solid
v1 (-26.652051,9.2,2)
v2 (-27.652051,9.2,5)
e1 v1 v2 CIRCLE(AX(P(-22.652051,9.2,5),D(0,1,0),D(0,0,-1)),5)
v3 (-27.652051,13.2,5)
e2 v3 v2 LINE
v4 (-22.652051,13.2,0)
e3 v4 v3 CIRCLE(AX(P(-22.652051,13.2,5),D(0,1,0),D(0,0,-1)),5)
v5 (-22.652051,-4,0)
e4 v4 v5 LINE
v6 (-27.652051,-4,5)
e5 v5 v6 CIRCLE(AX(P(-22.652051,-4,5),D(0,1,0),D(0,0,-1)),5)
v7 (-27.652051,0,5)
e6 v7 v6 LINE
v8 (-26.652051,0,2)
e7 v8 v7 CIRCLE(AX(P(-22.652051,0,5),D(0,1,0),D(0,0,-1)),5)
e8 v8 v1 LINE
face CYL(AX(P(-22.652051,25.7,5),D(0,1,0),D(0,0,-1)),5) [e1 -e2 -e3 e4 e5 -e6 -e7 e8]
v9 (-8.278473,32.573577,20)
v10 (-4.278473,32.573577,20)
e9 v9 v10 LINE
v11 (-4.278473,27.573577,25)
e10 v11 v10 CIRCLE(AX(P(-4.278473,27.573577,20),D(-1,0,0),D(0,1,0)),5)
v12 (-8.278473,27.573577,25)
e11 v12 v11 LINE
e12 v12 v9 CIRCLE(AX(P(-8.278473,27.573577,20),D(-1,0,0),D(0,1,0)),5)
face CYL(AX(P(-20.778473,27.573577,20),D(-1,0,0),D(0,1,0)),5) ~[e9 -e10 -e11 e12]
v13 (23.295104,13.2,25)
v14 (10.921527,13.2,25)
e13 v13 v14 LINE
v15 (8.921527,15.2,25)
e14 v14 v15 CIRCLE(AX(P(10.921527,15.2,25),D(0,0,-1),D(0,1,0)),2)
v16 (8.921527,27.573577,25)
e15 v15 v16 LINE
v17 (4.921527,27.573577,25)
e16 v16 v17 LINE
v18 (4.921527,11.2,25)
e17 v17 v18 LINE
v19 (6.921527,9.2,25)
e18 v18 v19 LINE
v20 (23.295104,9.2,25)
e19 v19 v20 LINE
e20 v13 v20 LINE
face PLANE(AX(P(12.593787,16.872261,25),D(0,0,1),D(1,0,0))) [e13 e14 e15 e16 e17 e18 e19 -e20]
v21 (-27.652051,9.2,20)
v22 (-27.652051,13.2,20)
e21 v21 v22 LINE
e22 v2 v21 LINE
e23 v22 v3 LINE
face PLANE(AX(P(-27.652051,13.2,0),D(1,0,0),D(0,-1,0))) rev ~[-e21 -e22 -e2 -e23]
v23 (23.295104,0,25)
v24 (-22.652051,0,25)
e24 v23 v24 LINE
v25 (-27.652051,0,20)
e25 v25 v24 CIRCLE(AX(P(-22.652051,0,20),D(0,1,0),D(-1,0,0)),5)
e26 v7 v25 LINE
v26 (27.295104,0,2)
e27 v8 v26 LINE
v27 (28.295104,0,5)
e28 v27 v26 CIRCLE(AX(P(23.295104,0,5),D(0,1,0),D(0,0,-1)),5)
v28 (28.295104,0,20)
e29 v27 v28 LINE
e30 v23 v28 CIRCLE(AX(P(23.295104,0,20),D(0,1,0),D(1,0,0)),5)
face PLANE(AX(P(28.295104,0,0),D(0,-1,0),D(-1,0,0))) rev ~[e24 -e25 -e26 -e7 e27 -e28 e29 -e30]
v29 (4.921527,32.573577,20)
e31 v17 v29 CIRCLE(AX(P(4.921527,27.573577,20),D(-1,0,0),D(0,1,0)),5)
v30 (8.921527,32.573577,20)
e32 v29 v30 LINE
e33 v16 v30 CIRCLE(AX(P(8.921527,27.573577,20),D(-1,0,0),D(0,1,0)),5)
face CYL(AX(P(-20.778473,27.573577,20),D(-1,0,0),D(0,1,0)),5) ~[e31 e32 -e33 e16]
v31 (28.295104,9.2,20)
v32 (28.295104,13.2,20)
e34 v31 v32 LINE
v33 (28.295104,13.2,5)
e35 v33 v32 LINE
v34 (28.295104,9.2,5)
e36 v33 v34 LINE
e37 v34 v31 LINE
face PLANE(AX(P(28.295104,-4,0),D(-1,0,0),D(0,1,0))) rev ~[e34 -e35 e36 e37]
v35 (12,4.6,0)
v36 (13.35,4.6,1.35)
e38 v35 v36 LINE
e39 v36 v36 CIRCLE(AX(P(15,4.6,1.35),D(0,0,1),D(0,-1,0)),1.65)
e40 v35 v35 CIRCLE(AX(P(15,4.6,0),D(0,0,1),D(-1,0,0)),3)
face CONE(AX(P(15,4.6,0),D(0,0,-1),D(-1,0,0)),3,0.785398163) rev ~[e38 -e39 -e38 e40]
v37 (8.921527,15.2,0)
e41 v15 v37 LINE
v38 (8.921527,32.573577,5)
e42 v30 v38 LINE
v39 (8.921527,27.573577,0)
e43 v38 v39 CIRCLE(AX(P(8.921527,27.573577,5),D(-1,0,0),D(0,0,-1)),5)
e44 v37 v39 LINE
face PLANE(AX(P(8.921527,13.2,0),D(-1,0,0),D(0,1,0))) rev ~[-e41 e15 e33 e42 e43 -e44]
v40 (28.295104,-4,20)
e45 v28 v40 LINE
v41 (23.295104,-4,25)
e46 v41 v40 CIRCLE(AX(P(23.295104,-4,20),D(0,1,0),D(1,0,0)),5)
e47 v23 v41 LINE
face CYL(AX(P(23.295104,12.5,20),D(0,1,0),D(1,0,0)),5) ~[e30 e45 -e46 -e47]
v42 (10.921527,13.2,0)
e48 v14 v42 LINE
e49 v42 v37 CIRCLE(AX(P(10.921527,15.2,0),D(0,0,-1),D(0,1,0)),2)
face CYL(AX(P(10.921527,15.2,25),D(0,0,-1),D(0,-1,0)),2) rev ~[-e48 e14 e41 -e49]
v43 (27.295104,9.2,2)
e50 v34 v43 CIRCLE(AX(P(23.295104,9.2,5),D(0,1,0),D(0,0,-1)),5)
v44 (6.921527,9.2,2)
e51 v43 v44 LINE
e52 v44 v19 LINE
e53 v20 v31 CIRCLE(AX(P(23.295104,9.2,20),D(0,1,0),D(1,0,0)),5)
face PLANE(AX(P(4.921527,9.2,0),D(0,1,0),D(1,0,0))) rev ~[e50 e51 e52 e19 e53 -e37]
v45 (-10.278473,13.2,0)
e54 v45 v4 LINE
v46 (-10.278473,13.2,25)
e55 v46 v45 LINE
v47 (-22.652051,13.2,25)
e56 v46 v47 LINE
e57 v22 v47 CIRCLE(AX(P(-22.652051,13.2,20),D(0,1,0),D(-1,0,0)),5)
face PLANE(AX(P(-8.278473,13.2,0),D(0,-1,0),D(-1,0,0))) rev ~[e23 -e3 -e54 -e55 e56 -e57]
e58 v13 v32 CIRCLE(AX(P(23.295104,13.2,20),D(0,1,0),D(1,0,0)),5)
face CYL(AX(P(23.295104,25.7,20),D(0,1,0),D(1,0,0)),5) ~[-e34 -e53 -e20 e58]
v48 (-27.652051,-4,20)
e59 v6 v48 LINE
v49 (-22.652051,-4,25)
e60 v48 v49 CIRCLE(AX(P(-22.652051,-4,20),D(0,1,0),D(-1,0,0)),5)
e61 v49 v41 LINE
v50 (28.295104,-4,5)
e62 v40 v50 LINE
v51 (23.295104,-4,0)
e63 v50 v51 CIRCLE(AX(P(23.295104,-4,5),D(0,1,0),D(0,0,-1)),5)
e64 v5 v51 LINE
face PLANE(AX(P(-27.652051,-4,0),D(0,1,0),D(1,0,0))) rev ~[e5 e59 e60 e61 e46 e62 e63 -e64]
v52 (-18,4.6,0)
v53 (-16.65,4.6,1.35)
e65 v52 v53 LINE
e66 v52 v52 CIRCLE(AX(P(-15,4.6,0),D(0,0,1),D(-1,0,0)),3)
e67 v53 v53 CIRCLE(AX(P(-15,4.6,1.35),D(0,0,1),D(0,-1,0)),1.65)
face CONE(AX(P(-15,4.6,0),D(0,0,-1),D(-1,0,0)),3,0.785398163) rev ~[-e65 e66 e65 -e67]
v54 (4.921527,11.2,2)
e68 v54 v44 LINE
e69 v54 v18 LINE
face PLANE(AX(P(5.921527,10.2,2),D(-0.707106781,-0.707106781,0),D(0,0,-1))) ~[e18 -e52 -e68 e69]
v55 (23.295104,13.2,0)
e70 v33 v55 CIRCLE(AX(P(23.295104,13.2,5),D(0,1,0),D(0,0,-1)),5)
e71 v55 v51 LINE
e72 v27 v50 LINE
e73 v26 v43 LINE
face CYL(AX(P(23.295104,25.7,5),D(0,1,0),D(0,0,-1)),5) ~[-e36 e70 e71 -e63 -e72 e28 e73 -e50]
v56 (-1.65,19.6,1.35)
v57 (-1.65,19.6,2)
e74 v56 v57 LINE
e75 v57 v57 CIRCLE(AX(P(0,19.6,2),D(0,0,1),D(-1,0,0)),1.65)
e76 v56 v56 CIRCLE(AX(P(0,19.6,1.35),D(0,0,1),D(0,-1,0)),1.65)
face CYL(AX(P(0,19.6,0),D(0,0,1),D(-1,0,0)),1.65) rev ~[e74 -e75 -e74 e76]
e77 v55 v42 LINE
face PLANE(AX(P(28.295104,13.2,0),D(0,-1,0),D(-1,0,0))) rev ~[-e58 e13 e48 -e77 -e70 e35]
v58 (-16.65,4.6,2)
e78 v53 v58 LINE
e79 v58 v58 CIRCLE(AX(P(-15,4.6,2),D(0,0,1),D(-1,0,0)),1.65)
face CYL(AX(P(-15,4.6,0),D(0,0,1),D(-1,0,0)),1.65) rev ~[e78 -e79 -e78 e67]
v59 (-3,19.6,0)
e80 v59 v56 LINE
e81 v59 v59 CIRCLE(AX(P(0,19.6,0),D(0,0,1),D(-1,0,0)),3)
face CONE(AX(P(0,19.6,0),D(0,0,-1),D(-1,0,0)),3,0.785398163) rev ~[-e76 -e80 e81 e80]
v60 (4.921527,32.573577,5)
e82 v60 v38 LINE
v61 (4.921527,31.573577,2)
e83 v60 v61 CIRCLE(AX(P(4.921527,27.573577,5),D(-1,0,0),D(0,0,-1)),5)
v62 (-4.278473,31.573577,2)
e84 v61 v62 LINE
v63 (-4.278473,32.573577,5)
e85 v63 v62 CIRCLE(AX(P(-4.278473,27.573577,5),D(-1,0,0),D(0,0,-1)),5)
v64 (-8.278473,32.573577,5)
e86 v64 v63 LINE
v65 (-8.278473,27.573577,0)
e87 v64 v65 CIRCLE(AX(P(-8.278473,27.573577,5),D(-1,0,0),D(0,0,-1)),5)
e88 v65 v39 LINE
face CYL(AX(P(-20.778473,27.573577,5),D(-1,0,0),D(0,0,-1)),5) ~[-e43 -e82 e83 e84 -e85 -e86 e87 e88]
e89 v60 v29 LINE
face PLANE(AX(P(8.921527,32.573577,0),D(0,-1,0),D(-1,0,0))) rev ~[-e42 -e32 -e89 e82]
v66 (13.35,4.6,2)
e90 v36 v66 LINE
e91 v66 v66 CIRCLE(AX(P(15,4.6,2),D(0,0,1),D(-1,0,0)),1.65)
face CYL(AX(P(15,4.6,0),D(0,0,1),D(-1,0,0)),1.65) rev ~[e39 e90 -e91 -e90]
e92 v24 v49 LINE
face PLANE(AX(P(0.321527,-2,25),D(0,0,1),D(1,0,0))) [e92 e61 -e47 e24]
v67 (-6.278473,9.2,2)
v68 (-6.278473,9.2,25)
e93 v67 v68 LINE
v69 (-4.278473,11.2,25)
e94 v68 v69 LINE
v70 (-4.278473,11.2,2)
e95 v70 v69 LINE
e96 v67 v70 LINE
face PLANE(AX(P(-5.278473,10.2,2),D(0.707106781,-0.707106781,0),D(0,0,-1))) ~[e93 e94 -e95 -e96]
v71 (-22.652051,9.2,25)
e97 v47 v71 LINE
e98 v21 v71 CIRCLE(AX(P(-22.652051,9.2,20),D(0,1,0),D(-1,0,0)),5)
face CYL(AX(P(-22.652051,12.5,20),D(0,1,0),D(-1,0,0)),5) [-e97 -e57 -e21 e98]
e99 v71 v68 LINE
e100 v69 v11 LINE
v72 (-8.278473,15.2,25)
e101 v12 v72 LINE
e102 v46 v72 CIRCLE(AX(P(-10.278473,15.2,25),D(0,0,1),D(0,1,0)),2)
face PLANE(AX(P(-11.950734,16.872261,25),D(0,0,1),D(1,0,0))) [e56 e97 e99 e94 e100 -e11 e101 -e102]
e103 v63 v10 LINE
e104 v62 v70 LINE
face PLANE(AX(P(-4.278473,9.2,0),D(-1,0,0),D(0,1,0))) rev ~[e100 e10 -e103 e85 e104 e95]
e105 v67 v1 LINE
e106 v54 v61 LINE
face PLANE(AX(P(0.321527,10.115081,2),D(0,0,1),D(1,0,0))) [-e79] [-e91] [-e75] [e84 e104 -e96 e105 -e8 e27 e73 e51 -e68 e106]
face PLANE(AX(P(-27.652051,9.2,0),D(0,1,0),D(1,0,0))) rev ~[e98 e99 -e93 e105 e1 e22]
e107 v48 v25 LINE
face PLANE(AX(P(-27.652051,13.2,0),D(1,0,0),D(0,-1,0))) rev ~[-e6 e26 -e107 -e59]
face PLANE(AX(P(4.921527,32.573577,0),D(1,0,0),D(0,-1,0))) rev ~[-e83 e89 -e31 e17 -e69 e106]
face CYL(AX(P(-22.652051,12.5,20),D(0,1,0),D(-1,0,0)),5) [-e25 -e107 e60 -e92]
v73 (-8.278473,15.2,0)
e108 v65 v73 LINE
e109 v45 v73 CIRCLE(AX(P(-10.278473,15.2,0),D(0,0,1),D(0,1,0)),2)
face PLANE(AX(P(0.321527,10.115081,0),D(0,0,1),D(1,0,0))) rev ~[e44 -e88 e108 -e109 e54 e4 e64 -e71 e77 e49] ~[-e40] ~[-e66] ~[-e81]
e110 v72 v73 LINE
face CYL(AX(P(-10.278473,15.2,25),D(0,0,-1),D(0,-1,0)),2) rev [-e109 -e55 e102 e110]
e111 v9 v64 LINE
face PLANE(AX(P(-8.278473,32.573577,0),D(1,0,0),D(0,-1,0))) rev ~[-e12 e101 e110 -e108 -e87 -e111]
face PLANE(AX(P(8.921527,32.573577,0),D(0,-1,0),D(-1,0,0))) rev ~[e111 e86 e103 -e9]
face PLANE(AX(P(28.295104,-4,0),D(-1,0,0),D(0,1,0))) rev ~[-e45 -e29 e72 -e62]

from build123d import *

# Parameters (mm, degrees)
F1_DEPTH       = 2
F2_DEPTH       = 25
F3_R           = 2
F4_T1_DEPTH    = 29
F4_T3_DEPTH    = 29
F4_T5_DEPTH    = 29
F4_T7_DEPTH    = 29
F4_T9_DEPTH    = 42.2
F4_T11_DEPTH   = 42.2
F5_R           = 2
F6_SIZE        = 2
F8_D           = 3.3
F8_CSINK_D     = 6
F8_CSINK_ANGLE = 90


# Not quite as in the source:
# - a fillet or chamfer that OpenCascade refuses, or shapes differently, is made with other operations: its cross-section is extruded or revolved along the edge and cut away or added


with BuildPart() as f1:
    # F0 (on Top) → F1 (new body)
    with BuildSketch(Plane.XY):
        Polygon((-27.6520505063, 0), (0, 0), (28.2951036699, 0), (28.2951036699, 9.2), (4.9215265818, 9.2), (4.9215265818, 32.5735770881), (-4.2784734182, 32.5735770881), (-4.2784734182, 9.2), (-27.6520505063, 9.2), align=None)
        Polygon((28.2951036699, 0), (0, 0), (-27.6520505063, 0), (-27.6520505063, -4), (0, -4), (28.2951036699, -4), align=None)
        Polygon((4.9215265818, 9.2), (28.2951036699, 9.2), (28.2951036699, 13.2), (8.9215265818, 13.2), (8.9215265818, 32.5735770881), (4.9215265818, 32.5735770881), align=None)
        Polygon((-27.6520505063, 13.2), (-27.6520505063, 9.2), (-4.2784734182, 9.2), (-4.2784734182, 32.5735770881), (-8.2784734182, 32.5735770881), (-8.2784734182, 13.2), align=None)
    extrude(amount=F1_DEPTH)

    # F0 (on Top) → F2 (join)
    with BuildSketch(Plane.XY):
        Polygon((-27.6520505063, 13.2), (-27.6520505063, 9.2), (-4.2784734182, 9.2), (-4.2784734182, 32.5735770881), (-8.2784734182, 32.5735770881), (-8.2784734182, 13.2), align=None)
        Polygon((4.9215265818, 9.2), (28.2951036699, 9.2), (28.2951036699, 13.2), (8.9215265818, 13.2), (8.9215265818, 32.5735770881), (4.9215265818, 32.5735770881), align=None)
        Polygon((28.2951036699, 0), (0, 0), (-27.6520505063, 0), (-27.6520505063, -4), (0, -4), (28.2951036699, -4), align=None)
    extrude(amount=F2_DEPTH)

    # F3
    f3_edges = [f1.edges().sort_by_distance(p)[0] for p in [
        (8.921527, 13.2, 12.5),
    ]]
    fillet(f3_edges, radius=F3_R)

    # F4: fillet of radius 5 on 9 edges, made by hand

    # F4_s2 → F4_t1 (cut)
    with BuildSketch(Plane.XZ.offset(-12.5)):
        with BuildLine():
            ThreePointArc((28.2951036699, 20), (26.8306375758, 23.5355339059), (23.2951036699, 25))
            Line((23.2951036699, 25), (28.2951036699, 25))
            Line((28.2951036699, 25), (28.2951036699, 20))
        make_face()
        with BuildLine():
            ThreePointArc((-27.6520505063, 20), (-26.1875844123, 23.5355339059), (-22.6520505063, 25))
            Line((-22.6520505063, 25), (-27.6520505063, 25))
            Line((-27.6520505063, 25), (-27.6520505063, 20))
        make_face()
    extrude(amount=F4_T1_DEPTH, mode=Mode.SUBTRACT)

    # F4_s4 → F4_t3 (cut)
    with BuildSketch(Plane.XZ.offset(-25.7)):
        with BuildLine():
            ThreePointArc((28.2951036699, 20), (26.8306375758, 23.5355339059), (23.2951036699, 25))
            Line((23.2951036699, 25), (28.2951036699, 25))
            Line((28.2951036699, 25), (28.2951036699, 20))
        make_face()
        with BuildLine():
            ThreePointArc((-27.6520505063, 20), (-26.1875844123, 23.5355339059), (-22.6520505063, 25))
            Line((-22.6520505063, 25), (-27.6520505063, 25))
            Line((-27.6520505063, 25), (-27.6520505063, 20))
        make_face()
    extrude(amount=F4_T3_DEPTH, mode=Mode.SUBTRACT)

    # F4_s6 → F4_t5 (cut)
    with BuildSketch(Plane.YZ.offset(-20.7784734182)):
        with BuildLine():
            ThreePointArc((32.5735770881, 20), (31.1091109941, 23.5355339059), (27.5735770881, 25))
            Line((27.5735770881, 25), (32.5735770881, 25))
            Line((32.5735770881, 25), (32.5735770881, 20))
        make_face()
    extrude(amount=F4_T5_DEPTH, mode=Mode.SUBTRACT)

    # F4_s8 → F4_t7 (cut)
    with BuildSketch(Plane.YZ.offset(-7.5784734182)):
        with BuildLine():
            ThreePointArc((32.5735770881, 20), (31.1091109941, 23.5355339059), (27.5735770881, 25))
            Line((27.5735770881, 25), (32.5735770881, 25))
            Line((32.5735770881, 25), (32.5735770881, 20))
        make_face()
    extrude(amount=F4_T7_DEPTH, mode=Mode.SUBTRACT)

    # F4_s10 → F4_t9 (cut)
    with BuildSketch(Plane.XZ.offset(-25.7)):
        with BuildLine():
            ThreePointArc((-22.6520505063, 0), (-26.1875844123, 1.4644660941), (-27.6520505063, 5))
            Line((-27.6520505063, 5), (-27.6520505063, 0))
            Line((-27.6520505063, 0), (-22.6520505063, 0))
        make_face()
        with BuildLine():
            ThreePointArc((23.2951036699, 0), (26.8306375758, 1.4644660941), (28.2951036699, 5))
            Line((28.2951036699, 5), (28.2951036699, 0))
            Line((28.2951036699, 0), (23.2951036699, 0))
        make_face()
    extrude(amount=F4_T9_DEPTH, mode=Mode.SUBTRACT)

    # F4_s12 → F4_t11 (cut)
    with BuildSketch(Plane.YZ.offset(-20.7784734182)):
        with BuildLine():
            ThreePointArc((27.5735770881, 0), (31.1091109941, 1.4644660941), (32.5735770881, 5))
            Line((32.5735770881, 5), (32.5735770881, 0))
            Line((32.5735770881, 0), (27.5735770881, 0))
        make_face()
    extrude(amount=F4_T11_DEPTH, mode=Mode.SUBTRACT)

    # F5
    f5_edges = [f1.edges().sort_by_distance(p)[0] for p in [
        (-8.278473, 13.2, 12.5),
    ]]
    fillet(f5_edges, radius=F5_R)

    # F6
    f6_edges = [f1.edges().sort_by_distance(p)[0] for p in [
        (4.921527, 9.2, 13.5),
        (-4.278473, 9.2, 13.5),
    ]]
    chamfer(f6_edges, length=F6_SIZE)

    # F8 (through all)
    with Locations(Plane(origin=(0, 0, 0), x_dir=(1, 0, 0), z_dir=(0, 0, -1))):
        with Locations((-15, -4.6), (0, -19.6), (15, -4.6)):
            CounterSinkHole(F8_D / 2, F8_CSINK_D / 2, counter_sink_angle=F8_CSINK_ANGLE)


solid = f1.part
